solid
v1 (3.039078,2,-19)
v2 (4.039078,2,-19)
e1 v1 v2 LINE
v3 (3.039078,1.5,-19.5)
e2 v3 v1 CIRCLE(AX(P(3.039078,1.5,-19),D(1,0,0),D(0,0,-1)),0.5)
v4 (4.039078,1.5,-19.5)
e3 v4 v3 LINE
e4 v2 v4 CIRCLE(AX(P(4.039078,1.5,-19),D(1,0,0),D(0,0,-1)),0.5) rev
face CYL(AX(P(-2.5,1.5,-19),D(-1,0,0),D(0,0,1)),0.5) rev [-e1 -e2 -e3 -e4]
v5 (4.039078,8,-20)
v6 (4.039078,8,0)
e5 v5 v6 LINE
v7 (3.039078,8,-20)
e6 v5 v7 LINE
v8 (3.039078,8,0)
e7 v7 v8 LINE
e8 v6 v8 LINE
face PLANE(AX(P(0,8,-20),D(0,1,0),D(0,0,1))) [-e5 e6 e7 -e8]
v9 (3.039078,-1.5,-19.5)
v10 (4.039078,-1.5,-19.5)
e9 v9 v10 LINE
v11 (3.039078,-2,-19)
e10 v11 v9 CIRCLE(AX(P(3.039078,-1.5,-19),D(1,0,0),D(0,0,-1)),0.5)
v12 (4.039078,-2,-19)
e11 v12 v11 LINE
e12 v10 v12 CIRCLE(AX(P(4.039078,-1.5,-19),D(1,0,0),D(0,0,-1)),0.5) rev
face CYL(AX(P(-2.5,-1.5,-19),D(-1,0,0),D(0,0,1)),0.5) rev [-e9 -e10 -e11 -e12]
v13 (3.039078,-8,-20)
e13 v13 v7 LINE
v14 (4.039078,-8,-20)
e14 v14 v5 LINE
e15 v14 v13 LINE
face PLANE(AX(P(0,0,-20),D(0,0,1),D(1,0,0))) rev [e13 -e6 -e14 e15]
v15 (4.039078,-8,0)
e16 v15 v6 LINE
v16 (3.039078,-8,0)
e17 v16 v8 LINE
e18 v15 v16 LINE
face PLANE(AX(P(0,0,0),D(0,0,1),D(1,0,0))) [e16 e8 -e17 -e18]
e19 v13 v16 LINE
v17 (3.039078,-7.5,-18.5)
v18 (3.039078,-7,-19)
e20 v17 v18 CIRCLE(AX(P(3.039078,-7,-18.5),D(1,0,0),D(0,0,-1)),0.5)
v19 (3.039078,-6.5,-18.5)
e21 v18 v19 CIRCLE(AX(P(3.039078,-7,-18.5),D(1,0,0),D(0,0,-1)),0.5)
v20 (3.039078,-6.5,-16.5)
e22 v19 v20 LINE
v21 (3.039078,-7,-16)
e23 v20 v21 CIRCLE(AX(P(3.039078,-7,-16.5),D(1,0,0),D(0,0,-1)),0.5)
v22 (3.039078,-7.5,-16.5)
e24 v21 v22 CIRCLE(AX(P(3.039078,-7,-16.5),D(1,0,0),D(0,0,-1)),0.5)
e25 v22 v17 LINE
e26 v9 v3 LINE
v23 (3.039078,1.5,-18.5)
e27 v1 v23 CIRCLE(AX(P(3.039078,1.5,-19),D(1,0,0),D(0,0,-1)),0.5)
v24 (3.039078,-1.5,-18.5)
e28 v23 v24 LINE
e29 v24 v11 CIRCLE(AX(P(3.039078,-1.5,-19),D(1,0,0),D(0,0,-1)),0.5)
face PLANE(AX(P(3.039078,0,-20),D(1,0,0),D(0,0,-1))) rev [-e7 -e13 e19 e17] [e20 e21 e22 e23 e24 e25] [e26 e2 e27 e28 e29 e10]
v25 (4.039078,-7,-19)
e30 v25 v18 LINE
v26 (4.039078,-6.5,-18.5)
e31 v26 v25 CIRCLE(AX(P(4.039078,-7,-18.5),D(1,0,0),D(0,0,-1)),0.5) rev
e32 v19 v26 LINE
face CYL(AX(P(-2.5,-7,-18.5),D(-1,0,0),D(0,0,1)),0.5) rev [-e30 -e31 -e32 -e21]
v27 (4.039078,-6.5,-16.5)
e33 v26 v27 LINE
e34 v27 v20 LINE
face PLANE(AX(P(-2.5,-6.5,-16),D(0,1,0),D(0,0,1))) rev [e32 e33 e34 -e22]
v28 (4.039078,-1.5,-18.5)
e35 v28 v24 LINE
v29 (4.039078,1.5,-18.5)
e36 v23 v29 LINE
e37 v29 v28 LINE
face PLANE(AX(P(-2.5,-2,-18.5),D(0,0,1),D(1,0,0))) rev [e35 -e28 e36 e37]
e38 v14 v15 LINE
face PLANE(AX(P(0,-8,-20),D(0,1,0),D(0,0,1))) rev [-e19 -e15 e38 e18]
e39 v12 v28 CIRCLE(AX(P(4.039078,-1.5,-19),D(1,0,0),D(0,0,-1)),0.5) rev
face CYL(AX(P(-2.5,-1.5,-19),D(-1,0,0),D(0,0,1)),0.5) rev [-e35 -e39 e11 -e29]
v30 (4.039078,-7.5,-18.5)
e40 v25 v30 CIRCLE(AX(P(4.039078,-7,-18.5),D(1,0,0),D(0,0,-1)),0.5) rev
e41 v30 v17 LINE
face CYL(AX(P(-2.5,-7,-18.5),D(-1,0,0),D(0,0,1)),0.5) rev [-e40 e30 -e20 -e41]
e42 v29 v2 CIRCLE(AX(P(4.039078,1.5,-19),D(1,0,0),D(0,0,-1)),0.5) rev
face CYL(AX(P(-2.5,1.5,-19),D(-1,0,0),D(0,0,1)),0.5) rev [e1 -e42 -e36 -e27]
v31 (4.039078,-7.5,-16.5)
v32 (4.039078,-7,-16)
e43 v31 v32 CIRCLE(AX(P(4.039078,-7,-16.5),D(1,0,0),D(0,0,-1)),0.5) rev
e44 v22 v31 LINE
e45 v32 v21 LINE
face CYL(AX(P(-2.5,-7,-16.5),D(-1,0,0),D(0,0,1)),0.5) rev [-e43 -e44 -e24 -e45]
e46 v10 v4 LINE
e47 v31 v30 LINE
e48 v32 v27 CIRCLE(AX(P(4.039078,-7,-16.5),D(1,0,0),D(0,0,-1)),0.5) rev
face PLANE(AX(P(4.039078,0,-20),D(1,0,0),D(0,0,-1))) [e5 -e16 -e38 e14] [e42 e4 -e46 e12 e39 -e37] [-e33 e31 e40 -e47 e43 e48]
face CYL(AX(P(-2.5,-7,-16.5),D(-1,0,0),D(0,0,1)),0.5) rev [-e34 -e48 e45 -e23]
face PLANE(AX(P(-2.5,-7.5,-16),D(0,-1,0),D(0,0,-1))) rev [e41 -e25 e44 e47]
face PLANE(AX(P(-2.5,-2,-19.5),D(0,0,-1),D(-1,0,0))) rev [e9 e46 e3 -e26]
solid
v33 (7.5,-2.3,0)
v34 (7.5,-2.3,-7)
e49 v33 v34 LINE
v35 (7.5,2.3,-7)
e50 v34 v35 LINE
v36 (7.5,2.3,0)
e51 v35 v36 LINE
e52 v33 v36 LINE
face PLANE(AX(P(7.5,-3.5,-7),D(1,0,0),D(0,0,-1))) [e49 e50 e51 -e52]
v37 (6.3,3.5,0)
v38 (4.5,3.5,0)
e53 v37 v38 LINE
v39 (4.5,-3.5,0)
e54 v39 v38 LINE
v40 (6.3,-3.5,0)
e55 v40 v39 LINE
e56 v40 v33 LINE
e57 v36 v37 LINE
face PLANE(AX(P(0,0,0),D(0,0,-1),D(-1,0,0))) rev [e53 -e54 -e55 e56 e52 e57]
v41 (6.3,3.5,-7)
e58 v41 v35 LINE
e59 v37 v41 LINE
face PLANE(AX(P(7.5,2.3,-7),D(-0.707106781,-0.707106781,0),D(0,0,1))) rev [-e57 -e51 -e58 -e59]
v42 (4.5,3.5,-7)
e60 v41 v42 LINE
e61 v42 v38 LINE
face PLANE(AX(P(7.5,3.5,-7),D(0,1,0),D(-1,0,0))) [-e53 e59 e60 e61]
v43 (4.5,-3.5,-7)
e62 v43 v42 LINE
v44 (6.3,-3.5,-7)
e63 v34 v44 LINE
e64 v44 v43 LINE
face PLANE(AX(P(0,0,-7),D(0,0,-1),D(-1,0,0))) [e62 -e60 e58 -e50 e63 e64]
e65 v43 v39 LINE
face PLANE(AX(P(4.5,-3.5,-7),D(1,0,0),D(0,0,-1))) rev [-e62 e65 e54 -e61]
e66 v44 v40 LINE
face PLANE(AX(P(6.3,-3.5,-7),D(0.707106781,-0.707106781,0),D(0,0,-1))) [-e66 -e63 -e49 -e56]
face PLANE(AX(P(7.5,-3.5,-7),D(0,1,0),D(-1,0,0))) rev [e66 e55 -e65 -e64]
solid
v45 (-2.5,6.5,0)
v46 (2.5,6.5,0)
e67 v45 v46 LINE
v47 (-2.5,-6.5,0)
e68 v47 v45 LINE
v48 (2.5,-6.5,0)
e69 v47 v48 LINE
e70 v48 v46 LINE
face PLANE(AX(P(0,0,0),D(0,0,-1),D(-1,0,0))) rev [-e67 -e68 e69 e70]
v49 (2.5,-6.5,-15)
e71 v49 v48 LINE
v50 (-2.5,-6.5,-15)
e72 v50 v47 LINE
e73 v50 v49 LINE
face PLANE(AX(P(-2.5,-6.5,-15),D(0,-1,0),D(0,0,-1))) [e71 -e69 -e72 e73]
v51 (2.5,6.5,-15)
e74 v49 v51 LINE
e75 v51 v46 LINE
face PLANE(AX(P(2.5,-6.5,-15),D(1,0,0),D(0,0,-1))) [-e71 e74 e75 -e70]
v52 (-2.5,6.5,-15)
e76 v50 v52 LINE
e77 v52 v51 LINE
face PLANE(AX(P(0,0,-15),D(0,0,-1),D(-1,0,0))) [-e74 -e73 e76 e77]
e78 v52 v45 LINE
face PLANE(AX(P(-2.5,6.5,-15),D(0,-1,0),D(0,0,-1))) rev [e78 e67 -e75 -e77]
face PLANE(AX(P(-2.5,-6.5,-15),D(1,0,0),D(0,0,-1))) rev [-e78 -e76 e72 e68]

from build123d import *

# Parameters (mm, degrees)
SKETCH_1_W          = 1
SKETCH_1_H          = 16
EXTRUDE_1_DEPTH     = 20
SKETCH_1_3_W        = 5
SKETCH_1_3_H        = 13
EXTRUDE_2_DEPTH     = 15
SKETCH_1_4_W        = 3
SKETCH_1_4_H        = 7
EXTRUDE_3_DEPTH     = 7
SKETCH_2_W          = 1
SKETCH_2_H          = 4
SKETCH_2_W_2        = 3
SKETCH_2_H_2        = 1
CUT_EXTRUDE_1_DEPTH = 23.511320343
FILLET_1_R          = 0.5
CHAMFER_1_SIZE      = 1.2


with BuildPart() as part:
    # Эскиз1 → Бобышка-Вытянуть1 (new body)
    with BuildSketch(Plane.XY):
        with Locations((3.539078192, 0)):
            Rectangle(SKETCH_1_W, SKETCH_1_H)
    extrude(amount=-EXTRUDE_1_DEPTH)

    # Эскиз2 → Вырез-Вытянуть1 (cut, through all)
    with BuildSketch(Plane(origin=(4.039078192, 0, 0), x_dir=(0, 0, -1), z_dir=(1, 0, 0))):
        with Locations((19, 0)):
            Rectangle(SKETCH_2_W, SKETCH_2_H)
        with Locations((17.5, -7)):
            Rectangle(SKETCH_2_W_2, SKETCH_2_H_2)
    extrude(amount=-CUT_EXTRUDE_1_DEPTH, mode=Mode.SUBTRACT)

    # Скругление1
    fillet_1_edges = [part.edges().sort_by_distance(p)[0] for p in [
        (3.539078192, -2, -18.5),
        (3.539078192, 2, -18.5),
        (3.539078192, 2, -19.5),
        (3.539078192, -2, -19.5),
        (3.539078192, -7.5, -19),
        (3.539078192, -6.5, -19),
        (3.539078192, -6.5, -16),
        (3.539078192, -7.5, -16),
    ]]
    fillet(fillet_1_edges, radius=FILLET_1_R - 0.0001)  # a hair under: the kernel refuses the full size


with BuildPart() as body_2:
    # Эскиз1<3> → Бобышка-Вытянуть2 (new body)
    with BuildSketch(Plane.XY):
        Rectangle(SKETCH_1_3_W, SKETCH_1_3_H)
    extrude(amount=-EXTRUDE_2_DEPTH)


with BuildPart() as body_3:
    # Эскиз1<4> → Бобышка-Вытянуть3 (new body)
    with BuildSketch(Plane.XY):
        with Locations((6, 0)):
            Rectangle(SKETCH_1_4_W, SKETCH_1_4_H)
    extrude(amount=-EXTRUDE_3_DEPTH)

    # Фаска1
    chamfer_1_edges = [body_3.edges().sort_by_distance(p)[0] for p in [
        (7.5, -3.5, -3.5),
        (7.5, 3.5, -3.5),
    ]]
    chamfer(chamfer_1_edges, length=CHAMFER_1_SIZE)


solid = Compound([part.part, body_2.part, body_3.part])
